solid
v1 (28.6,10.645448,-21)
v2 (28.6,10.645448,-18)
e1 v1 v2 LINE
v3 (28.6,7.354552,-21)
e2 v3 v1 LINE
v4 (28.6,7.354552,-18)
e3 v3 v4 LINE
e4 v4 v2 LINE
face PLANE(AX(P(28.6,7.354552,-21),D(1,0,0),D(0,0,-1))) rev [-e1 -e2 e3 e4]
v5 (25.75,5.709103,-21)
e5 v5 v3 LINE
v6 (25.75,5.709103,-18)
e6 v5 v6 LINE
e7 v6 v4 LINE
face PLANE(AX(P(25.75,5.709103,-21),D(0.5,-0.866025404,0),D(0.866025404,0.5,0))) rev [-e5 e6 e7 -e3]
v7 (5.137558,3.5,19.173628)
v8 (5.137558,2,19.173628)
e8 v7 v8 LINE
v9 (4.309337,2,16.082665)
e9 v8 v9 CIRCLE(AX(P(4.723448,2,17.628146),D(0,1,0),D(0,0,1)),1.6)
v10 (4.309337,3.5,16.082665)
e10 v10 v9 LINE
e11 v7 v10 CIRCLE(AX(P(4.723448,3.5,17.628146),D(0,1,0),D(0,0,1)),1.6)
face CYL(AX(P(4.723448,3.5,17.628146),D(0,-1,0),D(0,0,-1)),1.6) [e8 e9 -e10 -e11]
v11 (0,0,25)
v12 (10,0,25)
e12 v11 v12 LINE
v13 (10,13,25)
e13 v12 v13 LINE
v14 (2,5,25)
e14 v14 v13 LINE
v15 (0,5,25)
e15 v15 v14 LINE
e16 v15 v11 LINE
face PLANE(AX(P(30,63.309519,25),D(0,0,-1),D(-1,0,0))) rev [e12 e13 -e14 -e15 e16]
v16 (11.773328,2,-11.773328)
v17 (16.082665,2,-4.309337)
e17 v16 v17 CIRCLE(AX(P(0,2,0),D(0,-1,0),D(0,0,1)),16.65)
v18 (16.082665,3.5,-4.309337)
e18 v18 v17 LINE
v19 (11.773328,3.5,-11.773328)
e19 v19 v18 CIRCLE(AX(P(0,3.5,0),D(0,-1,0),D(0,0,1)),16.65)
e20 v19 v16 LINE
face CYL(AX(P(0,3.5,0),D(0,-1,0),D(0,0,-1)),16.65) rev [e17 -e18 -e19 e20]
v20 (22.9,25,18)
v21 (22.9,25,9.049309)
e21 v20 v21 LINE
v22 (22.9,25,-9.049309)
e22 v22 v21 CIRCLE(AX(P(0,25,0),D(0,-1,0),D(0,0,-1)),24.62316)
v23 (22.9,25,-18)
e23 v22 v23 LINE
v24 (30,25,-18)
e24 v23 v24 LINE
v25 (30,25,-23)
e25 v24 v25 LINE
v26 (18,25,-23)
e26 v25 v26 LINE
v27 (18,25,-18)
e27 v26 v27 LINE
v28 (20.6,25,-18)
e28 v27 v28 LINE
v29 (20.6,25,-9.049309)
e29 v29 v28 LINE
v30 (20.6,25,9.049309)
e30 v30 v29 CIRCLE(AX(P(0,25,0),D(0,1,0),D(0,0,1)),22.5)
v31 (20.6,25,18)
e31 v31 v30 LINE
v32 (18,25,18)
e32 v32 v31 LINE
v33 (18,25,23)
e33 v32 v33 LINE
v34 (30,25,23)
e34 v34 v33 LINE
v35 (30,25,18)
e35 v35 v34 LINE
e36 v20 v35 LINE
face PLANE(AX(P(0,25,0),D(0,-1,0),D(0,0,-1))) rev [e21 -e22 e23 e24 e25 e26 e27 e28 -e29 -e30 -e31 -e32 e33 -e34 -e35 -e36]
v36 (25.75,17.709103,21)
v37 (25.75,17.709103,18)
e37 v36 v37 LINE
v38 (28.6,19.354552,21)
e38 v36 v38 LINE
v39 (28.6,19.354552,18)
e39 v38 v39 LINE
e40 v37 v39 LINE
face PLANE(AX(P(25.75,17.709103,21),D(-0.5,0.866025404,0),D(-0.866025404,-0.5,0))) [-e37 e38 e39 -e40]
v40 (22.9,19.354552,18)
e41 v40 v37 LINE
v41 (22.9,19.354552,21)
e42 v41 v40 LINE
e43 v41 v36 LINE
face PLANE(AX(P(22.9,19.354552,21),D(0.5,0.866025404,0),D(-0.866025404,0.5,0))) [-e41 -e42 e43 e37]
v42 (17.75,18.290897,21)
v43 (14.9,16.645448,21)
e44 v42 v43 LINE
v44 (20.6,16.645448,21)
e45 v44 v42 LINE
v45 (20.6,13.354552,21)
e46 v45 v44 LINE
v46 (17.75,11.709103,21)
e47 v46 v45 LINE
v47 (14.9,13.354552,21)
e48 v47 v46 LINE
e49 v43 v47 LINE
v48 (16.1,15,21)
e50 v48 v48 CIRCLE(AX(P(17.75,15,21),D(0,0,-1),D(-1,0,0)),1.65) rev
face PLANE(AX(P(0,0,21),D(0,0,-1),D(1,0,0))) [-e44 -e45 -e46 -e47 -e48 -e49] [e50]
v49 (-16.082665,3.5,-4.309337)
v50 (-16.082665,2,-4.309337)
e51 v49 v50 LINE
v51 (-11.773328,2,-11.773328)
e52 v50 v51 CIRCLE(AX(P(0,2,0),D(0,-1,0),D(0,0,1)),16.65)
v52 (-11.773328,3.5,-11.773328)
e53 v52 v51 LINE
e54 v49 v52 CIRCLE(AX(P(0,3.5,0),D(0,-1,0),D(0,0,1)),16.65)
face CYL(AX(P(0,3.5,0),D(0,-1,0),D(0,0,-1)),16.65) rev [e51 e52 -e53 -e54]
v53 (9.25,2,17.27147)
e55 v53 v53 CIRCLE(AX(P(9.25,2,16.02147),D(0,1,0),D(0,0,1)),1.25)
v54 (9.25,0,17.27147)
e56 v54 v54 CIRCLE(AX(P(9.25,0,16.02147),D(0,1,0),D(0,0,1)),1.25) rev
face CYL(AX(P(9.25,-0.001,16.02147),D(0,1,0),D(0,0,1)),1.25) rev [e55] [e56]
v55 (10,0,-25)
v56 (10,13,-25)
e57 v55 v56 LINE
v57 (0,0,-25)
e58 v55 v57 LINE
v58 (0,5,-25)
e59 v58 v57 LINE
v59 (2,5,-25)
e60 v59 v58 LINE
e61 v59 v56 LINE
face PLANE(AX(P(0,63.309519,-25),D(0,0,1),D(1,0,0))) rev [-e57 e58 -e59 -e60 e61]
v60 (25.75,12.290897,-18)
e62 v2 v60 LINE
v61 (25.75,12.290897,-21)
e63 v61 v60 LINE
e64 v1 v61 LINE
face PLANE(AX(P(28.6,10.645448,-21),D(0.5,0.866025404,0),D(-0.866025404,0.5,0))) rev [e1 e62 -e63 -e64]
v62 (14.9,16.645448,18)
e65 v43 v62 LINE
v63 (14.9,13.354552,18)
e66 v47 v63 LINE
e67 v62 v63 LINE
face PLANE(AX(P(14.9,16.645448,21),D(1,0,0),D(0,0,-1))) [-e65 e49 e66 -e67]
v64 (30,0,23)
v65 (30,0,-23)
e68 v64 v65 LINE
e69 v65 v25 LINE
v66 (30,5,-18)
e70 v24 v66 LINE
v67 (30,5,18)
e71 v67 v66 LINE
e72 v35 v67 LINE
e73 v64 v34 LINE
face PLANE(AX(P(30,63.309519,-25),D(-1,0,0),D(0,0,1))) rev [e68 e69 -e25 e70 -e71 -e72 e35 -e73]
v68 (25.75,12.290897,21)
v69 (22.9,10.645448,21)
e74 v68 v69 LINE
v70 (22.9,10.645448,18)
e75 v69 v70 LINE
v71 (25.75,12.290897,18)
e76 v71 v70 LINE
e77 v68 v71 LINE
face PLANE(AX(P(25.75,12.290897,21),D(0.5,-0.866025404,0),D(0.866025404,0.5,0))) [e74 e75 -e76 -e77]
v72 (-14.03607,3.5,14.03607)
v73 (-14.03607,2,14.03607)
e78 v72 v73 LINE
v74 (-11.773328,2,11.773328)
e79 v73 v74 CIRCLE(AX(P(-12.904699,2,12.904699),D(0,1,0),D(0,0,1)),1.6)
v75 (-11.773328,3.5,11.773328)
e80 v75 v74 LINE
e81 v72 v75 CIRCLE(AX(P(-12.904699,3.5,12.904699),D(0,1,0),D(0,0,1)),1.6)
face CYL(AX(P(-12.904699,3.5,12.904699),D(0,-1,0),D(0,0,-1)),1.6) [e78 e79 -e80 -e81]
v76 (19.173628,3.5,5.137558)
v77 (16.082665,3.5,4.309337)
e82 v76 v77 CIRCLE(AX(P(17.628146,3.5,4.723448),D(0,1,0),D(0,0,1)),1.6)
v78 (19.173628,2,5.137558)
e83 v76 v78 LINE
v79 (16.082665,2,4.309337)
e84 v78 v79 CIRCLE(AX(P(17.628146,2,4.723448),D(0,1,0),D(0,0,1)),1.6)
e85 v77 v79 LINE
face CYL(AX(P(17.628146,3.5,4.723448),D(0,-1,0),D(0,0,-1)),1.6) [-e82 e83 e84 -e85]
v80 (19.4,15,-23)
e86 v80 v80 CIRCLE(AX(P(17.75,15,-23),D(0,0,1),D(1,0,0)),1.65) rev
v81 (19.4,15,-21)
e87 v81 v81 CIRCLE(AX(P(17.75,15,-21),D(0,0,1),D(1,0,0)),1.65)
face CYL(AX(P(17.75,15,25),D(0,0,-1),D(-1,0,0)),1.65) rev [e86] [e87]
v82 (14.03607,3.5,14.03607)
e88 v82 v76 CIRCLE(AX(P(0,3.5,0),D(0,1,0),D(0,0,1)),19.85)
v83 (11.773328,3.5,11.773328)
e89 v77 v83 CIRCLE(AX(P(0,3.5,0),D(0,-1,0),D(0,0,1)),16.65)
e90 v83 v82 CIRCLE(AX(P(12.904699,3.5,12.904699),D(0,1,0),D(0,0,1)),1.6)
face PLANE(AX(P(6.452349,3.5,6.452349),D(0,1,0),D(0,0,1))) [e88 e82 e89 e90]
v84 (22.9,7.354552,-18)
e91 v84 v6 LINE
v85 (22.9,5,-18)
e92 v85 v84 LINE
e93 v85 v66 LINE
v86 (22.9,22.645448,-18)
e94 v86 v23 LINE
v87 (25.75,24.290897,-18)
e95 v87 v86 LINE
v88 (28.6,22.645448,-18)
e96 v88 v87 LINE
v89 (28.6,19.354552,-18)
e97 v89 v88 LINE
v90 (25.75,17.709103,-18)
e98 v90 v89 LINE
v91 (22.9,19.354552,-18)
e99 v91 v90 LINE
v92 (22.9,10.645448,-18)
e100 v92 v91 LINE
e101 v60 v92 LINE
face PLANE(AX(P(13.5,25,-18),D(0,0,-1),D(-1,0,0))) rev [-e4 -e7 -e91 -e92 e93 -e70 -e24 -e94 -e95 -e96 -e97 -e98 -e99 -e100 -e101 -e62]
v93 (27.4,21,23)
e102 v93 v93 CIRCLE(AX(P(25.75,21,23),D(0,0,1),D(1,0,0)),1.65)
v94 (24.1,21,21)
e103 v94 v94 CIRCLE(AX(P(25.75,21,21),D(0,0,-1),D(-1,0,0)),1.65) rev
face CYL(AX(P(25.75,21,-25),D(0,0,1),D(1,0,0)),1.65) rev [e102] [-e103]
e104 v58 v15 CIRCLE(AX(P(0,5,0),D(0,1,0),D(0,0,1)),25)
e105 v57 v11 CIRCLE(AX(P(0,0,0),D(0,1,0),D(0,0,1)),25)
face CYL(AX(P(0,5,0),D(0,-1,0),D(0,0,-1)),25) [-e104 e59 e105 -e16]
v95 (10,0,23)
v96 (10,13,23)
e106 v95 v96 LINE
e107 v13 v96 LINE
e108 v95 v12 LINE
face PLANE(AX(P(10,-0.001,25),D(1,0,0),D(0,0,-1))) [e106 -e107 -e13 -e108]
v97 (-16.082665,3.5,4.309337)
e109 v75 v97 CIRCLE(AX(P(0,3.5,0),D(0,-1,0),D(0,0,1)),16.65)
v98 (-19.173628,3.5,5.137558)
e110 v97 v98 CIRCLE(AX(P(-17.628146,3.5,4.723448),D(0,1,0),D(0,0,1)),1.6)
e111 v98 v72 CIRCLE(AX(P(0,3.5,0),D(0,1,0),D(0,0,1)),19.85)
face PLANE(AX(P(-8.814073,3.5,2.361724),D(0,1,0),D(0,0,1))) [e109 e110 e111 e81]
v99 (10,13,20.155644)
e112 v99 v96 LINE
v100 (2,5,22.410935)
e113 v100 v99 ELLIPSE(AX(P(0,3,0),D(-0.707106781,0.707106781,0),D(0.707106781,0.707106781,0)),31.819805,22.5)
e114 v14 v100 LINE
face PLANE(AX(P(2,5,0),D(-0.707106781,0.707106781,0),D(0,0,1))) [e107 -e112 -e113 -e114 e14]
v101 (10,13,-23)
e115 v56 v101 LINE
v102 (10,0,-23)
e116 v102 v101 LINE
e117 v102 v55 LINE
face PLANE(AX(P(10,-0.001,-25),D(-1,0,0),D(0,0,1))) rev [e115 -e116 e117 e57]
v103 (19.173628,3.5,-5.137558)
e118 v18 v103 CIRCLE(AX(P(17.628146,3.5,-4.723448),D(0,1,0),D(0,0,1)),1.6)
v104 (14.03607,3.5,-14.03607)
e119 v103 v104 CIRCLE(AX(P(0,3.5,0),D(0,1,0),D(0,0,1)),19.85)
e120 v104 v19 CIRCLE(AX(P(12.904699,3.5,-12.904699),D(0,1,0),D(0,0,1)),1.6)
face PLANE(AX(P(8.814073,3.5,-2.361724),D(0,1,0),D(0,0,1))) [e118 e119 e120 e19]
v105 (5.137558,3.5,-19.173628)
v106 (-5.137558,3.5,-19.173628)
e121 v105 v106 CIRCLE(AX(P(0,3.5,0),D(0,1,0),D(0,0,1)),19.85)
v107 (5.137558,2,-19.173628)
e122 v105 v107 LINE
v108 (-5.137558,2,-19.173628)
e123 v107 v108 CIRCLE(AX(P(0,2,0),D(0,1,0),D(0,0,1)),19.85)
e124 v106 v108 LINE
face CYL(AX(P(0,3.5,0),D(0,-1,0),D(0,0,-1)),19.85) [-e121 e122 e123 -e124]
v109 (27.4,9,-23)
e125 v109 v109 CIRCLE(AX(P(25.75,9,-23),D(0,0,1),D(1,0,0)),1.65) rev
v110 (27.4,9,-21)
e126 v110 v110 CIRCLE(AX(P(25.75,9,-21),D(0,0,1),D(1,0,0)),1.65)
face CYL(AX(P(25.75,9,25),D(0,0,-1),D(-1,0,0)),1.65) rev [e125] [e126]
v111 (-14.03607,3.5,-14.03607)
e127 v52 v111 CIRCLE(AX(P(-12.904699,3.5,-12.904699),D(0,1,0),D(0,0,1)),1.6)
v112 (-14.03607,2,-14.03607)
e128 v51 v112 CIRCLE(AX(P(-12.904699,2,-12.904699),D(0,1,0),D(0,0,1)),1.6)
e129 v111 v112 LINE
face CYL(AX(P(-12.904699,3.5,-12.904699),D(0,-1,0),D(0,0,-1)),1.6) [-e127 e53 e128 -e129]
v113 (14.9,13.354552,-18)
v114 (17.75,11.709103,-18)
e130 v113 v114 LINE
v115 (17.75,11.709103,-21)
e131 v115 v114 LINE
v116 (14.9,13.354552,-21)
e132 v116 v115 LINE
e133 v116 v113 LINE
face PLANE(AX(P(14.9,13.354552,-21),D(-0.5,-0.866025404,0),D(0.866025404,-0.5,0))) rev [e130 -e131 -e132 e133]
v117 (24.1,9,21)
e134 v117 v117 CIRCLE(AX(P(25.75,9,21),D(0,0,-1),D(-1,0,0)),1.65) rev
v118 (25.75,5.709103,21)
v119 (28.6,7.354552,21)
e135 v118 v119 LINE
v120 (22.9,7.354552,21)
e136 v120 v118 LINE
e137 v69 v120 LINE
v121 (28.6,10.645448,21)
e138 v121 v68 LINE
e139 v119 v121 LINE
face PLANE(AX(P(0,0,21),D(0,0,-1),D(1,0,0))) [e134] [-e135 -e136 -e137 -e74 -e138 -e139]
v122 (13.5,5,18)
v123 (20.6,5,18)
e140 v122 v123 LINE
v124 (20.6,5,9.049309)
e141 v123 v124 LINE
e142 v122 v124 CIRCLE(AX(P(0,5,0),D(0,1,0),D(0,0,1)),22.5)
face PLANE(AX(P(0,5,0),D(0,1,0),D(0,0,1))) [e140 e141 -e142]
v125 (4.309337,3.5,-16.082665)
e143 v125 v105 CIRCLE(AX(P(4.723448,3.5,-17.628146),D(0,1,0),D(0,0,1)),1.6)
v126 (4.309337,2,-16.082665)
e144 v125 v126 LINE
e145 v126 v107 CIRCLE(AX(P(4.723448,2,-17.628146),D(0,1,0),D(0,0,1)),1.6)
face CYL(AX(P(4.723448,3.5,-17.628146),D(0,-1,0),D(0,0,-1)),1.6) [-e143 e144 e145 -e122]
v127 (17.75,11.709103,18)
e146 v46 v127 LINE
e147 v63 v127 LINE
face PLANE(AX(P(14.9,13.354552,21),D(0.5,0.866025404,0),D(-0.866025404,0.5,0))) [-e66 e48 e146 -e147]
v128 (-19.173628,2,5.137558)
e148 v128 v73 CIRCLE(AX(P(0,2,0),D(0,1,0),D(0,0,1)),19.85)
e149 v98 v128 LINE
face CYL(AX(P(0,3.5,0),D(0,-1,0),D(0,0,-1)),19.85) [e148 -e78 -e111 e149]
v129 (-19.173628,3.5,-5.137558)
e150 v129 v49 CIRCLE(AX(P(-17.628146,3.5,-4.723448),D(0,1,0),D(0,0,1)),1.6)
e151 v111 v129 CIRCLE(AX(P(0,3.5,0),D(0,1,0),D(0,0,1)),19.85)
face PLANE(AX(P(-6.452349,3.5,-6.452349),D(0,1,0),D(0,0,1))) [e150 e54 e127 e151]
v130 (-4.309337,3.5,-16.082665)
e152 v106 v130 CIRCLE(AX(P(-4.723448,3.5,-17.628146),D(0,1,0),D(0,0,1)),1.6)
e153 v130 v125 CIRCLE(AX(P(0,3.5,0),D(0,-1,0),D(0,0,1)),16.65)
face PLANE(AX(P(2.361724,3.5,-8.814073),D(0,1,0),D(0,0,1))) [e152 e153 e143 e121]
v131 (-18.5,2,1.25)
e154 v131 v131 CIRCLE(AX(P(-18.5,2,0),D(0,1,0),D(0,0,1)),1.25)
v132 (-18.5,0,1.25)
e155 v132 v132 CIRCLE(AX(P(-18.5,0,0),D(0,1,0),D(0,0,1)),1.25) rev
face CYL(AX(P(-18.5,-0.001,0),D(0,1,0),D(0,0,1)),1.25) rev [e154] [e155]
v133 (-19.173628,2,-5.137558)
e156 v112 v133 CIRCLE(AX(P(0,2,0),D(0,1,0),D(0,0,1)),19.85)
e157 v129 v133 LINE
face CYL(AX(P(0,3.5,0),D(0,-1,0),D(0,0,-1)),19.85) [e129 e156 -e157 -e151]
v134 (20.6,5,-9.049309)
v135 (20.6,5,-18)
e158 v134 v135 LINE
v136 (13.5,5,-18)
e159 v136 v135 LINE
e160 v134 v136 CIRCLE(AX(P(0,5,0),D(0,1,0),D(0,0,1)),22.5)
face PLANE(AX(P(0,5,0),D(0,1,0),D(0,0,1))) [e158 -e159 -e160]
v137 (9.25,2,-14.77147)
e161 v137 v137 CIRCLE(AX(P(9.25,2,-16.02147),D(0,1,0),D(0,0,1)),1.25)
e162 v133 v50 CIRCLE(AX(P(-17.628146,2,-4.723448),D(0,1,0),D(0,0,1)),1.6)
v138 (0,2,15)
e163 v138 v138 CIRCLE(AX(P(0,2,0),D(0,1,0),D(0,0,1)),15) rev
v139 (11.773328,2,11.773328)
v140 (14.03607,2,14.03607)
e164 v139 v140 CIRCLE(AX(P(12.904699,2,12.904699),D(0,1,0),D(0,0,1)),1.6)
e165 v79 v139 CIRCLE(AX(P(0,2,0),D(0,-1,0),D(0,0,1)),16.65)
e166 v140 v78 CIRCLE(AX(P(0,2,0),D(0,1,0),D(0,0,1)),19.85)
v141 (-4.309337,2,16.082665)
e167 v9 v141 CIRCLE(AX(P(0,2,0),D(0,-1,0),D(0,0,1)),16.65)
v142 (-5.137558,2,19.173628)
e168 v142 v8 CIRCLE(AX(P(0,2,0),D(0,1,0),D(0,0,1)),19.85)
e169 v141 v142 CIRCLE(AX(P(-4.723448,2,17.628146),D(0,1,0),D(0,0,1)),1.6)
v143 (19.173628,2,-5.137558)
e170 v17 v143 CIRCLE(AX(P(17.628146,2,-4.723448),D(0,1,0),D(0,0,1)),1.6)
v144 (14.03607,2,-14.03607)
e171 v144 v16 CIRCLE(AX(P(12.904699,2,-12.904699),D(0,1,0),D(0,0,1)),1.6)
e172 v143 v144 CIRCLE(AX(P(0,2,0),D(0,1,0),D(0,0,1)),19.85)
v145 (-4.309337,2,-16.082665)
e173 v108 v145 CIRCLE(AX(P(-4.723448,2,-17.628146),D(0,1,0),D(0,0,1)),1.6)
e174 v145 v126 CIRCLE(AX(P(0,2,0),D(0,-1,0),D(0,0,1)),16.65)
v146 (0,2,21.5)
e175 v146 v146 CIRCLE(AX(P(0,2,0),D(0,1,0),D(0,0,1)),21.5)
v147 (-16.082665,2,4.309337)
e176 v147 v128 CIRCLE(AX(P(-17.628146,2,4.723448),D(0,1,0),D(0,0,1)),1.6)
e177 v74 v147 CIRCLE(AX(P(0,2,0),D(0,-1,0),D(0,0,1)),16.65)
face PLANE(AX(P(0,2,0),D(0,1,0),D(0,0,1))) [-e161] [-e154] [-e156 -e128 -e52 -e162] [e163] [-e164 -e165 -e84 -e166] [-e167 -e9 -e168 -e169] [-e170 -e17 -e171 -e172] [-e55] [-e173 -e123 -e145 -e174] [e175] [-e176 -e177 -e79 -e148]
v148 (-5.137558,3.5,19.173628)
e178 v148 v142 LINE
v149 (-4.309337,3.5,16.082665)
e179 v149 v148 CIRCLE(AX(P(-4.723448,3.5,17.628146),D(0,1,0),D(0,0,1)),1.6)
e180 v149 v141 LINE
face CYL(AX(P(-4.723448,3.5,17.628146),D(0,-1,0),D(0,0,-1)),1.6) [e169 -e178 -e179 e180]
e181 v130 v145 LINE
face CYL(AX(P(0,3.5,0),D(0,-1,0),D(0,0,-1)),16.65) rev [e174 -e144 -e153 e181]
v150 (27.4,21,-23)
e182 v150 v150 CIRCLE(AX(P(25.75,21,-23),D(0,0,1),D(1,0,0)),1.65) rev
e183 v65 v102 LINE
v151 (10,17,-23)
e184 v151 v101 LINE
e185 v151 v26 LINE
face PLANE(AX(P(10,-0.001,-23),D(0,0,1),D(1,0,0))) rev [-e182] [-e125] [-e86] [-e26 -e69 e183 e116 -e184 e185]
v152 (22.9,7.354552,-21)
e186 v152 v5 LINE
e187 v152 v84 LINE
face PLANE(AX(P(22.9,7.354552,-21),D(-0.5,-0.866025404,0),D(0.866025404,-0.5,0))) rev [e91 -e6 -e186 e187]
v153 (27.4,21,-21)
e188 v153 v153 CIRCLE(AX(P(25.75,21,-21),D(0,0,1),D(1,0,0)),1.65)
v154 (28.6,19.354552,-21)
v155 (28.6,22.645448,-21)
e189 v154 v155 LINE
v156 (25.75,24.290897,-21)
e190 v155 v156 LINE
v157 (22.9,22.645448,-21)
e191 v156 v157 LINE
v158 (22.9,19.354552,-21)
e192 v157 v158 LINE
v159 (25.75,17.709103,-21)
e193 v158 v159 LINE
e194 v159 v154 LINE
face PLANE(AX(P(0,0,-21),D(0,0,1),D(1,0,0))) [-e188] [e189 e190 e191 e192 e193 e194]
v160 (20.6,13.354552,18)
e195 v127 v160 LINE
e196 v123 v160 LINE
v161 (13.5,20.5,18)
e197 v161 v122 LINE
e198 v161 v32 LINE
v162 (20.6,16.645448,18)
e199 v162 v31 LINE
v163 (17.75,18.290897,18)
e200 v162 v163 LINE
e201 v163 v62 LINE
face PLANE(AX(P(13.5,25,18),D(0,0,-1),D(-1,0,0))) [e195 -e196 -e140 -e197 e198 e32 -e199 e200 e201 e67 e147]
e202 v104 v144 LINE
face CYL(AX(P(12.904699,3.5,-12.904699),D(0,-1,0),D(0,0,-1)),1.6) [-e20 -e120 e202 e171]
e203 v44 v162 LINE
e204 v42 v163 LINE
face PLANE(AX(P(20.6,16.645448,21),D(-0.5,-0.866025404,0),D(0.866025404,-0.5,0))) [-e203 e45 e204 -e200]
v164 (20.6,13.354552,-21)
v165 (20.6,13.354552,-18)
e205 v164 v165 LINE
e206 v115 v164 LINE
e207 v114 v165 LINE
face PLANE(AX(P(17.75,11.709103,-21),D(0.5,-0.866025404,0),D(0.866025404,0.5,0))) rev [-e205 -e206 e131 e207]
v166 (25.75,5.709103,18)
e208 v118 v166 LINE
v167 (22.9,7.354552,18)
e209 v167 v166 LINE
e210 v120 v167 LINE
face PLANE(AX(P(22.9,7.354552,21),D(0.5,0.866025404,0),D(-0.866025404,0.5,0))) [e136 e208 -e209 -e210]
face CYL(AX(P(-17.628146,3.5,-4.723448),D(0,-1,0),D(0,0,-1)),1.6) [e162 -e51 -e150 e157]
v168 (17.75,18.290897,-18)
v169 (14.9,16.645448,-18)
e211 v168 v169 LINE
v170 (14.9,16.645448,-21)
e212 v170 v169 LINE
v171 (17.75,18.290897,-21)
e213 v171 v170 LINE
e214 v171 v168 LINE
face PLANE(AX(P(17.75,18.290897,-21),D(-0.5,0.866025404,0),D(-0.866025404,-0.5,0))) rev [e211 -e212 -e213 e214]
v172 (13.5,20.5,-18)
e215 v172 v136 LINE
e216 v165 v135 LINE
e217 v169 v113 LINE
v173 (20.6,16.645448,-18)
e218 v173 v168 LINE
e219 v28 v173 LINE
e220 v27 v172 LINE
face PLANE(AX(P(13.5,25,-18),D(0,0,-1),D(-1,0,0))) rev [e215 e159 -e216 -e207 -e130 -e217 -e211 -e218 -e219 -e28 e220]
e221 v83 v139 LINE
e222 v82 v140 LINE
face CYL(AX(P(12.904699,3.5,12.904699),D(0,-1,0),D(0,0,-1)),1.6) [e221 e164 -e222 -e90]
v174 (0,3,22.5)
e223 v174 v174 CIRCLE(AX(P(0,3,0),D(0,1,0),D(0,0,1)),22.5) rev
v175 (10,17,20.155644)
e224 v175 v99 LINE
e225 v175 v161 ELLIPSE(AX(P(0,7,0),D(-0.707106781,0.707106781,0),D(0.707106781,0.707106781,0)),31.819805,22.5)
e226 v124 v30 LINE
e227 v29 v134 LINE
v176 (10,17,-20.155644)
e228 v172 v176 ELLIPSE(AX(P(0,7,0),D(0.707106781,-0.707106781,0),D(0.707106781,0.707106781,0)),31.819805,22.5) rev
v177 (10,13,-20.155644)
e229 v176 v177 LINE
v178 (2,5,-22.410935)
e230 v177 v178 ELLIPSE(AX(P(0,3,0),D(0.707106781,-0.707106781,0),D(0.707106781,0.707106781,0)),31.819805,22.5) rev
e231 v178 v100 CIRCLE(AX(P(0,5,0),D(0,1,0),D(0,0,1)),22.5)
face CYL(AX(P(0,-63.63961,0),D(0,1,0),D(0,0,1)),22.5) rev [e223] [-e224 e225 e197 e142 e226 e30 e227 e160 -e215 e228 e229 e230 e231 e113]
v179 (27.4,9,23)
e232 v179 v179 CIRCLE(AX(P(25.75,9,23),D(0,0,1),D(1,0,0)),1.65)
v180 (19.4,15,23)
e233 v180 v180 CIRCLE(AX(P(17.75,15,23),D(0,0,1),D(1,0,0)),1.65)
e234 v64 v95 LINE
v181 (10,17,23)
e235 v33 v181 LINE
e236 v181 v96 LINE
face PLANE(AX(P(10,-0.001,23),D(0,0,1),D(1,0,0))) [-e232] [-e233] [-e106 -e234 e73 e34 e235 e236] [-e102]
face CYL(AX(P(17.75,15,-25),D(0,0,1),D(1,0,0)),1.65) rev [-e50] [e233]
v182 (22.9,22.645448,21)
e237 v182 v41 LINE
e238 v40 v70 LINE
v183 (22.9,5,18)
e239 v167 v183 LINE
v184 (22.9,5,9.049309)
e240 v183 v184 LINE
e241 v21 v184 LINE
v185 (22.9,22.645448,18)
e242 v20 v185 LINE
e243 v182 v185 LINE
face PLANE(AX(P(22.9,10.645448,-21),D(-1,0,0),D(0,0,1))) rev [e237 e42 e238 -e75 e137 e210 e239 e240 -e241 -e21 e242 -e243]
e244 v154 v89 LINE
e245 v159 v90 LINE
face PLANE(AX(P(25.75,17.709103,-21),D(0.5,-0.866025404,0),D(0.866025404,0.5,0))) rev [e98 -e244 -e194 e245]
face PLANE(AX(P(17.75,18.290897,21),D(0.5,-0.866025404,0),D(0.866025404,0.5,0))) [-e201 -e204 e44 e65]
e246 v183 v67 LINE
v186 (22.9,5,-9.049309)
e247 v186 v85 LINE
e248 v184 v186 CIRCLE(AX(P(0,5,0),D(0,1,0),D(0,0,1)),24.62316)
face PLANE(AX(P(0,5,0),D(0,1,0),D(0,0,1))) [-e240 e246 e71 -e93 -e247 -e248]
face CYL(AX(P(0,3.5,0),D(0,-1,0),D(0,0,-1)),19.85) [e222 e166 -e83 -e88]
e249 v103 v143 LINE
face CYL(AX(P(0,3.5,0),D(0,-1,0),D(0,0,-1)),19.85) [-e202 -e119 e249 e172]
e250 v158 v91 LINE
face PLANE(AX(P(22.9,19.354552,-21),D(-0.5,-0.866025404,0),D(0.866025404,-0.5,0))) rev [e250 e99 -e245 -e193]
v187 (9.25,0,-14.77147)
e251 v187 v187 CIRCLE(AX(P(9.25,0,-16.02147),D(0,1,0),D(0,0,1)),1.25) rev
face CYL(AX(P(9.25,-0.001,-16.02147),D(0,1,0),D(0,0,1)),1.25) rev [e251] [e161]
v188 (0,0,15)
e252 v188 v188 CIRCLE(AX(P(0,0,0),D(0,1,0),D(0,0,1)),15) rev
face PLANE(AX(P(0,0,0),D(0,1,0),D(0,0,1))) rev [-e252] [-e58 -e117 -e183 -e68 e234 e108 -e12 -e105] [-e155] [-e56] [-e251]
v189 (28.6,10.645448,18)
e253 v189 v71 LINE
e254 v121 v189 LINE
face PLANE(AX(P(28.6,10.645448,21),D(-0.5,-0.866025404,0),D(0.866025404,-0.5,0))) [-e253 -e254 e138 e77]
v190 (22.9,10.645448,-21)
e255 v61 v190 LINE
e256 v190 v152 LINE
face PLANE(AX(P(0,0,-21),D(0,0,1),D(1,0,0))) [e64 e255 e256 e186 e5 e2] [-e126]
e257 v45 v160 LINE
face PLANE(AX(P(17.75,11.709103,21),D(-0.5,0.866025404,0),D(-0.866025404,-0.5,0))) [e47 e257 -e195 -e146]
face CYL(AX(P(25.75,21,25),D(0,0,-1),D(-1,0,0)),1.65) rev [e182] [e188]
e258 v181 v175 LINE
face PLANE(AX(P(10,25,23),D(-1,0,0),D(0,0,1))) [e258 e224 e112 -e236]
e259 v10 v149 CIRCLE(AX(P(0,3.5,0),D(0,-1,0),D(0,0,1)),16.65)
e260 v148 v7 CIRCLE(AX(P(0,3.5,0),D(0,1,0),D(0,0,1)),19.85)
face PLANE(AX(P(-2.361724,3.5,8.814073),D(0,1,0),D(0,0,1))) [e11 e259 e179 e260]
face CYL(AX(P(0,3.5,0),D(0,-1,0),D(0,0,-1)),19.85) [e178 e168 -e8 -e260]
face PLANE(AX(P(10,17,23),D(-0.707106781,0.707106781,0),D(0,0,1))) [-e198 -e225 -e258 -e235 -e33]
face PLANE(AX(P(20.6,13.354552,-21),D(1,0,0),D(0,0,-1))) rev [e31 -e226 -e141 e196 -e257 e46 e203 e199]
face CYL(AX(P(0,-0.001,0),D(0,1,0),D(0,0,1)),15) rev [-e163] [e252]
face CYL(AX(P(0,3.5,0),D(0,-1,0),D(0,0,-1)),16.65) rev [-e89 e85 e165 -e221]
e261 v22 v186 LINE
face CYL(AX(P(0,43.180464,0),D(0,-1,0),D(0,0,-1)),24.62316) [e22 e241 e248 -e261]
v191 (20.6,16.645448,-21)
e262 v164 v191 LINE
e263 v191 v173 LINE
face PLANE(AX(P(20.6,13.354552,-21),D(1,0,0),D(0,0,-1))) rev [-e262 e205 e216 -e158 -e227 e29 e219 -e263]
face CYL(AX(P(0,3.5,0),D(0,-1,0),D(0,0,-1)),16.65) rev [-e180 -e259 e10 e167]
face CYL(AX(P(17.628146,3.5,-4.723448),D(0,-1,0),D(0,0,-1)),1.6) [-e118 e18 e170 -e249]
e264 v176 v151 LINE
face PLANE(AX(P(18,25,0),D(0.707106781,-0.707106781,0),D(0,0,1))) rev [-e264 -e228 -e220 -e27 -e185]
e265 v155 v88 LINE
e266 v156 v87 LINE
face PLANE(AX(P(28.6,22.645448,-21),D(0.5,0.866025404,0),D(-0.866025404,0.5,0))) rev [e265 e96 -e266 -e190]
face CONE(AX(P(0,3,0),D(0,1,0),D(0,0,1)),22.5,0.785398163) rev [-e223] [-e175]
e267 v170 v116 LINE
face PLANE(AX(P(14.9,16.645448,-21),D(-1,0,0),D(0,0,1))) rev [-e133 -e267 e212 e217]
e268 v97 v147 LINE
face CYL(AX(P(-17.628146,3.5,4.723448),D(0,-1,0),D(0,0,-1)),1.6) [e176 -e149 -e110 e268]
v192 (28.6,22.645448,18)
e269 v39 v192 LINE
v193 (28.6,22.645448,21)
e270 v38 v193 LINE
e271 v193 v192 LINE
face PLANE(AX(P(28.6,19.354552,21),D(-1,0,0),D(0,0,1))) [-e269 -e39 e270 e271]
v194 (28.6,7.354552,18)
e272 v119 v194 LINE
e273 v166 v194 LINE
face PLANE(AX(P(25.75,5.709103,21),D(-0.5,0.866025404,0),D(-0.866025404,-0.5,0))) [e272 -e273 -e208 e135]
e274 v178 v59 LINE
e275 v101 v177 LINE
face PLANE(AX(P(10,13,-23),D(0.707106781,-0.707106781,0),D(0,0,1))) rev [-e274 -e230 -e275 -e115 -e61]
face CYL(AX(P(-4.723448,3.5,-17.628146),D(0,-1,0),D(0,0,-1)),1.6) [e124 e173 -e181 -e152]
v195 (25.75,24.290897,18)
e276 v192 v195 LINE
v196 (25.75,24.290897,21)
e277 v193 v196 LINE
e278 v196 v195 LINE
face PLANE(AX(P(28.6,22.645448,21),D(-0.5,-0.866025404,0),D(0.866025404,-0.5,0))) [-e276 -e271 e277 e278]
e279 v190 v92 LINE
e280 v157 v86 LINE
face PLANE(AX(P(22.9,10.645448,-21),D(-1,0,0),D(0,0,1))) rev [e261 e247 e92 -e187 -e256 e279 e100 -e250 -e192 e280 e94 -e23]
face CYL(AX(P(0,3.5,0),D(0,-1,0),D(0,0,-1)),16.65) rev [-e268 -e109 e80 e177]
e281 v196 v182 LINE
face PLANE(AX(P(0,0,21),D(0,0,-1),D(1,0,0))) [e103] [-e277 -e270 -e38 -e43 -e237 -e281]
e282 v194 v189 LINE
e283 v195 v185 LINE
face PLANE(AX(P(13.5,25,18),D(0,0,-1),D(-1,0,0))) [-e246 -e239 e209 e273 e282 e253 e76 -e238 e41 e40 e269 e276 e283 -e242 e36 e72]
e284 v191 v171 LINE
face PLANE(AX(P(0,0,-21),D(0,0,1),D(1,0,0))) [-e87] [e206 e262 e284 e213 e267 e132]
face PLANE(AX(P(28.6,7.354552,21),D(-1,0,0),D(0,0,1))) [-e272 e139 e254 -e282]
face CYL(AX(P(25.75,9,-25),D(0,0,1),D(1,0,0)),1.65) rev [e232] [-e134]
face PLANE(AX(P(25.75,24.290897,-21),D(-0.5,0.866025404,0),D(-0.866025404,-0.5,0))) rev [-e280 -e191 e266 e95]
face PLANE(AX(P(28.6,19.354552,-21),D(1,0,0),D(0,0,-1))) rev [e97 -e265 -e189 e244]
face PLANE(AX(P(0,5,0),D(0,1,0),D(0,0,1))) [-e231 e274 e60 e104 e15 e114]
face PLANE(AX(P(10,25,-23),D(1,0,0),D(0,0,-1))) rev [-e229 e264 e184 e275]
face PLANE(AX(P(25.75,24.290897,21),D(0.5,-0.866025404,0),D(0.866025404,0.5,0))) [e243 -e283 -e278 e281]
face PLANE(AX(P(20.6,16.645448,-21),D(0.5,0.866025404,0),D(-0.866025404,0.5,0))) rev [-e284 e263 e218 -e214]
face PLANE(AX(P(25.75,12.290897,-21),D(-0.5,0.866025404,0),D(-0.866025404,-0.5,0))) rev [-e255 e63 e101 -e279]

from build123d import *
from build123d.topology import SkipClean

# Parameters (mm, degrees)
SKETCH_1_R                      = 25
EXTRUDE_1_DEPTH                 = 5
CUT_EXTRUDE_1_REACH             = 37.707
SKETCH_2_R                      = 15
SKETCH_3_R                      = 22.5
CUT_EXTRUDE_2_DEPTH             = 3
CUT_EXTRUDE_3_REACH             = 37.482
SKETCH_4_R                      = 1.25
CHAMFER_1_SIZE                  = 1
EXTRUDE_2_DEPTH                 = 1.5
EXTRUDE_3_DEPTH                 = 5
CUT_EXTRUDE_4_REACH             = 41.37
SKETCH_10_W                     = 20
SKETCH_10_H                     = 2
EXTRUDE_START                   = 20
EXTRUDE_4_DEPTH                 = 20
CUT_EXTRUDE_5_REACH             = 60.086
SKETCH_11_R                     = 1.65
CUT_EXTRUDE_5_DIRECTION_2_DEPTH = 59.086142926
CUT_EXTRUDE_6_DEPTH             = 3
CHAMFER_4_SIZE                  = 8
EXTRUDE_8_DEPTH                 = 2
SKETCH_15_W                     = 2.3
SKETCH_15_H                     = 20
EXTRUDE_9_DEPTH                 = 36
CUT_EXTRUDE_8_REACH             = 48.368
SKETCH_14_R                     = 22.5
EXTRUDE_7_DEPTH                 = 20


# Read off the part's stored shape, not the designer's step: 镜向3
with BuildPart() as part:
    # 草图1 → 凸台-拉伸1 (new body)
    with BuildSketch(Plane(origin=(0, 0, 0), x_dir=(1, 0, 0), z_dir=(0, 1, 0))):
        with Locations(Location((0, 0, 0), (0, 0, 270))):
            Circle(SKETCH_1_R)
    extrude(amount=EXTRUDE_1_DEPTH)

    # 草图2 → 切除-拉伸1 (cut, up to next)
    with BuildSketch(Plane(origin=(0, 5, 0), x_dir=(1, 0, 0), z_dir=(0, 1, 0)), mode=Mode.PRIVATE) as cut_extrude_1_sk1:
        with Locations(Location((0, 0, 0), (0, 0, 270))):
            Circle(SKETCH_2_R)
    cut_extrude_1_tool1 = extrude(cut_extrude_1_sk1.sketch, amount=-CUT_EXTRUDE_1_REACH, mode=Mode.PRIVATE) & part.part
    add(cut_extrude_1_tool1.solids().sort_by_distance((0, 5, 0))[0], mode=Mode.SUBTRACT)

    # 草图3 → 切除-拉伸2 (cut)
    with BuildSketch(Plane(origin=(0, 5, 0), x_dir=(1, 0, 0), z_dir=(0, 1, 0))):
        with Locations(Location((0, 0, 0), (0, 0, 270))):
            Circle(SKETCH_3_R)
    extrude(amount=-CUT_EXTRUDE_2_DEPTH, mode=Mode.SUBTRACT)

    # 草图4 → 切除-拉伸3 (cut, up to next)
    with BuildSketch(Plane(origin=(0, 2, 0), x_dir=(1, 0, 0), z_dir=(0, 1, 0)), mode=Mode.PRIVATE) as cut_extrude_3_sk1:
        with Locations(Location((9.25, -16.02146997, 0), (0, 0, 270))):
            Circle(SKETCH_4_R)
    cut_extrude_3_tool1 = extrude(cut_extrude_3_sk1.sketch, amount=-CUT_EXTRUDE_3_REACH, mode=Mode.PRIVATE) & part.part
    # 草图4 → 切除-拉伸3 (cut, up to next)
    with BuildSketch(Plane(origin=(0, 2, 0), x_dir=(1, 0, 0), z_dir=(0, 1, 0)), mode=Mode.PRIVATE) as cut_extrude_3_sk2:
        with Locations(Location((-18.5, 0, 0), (0, 0, 270))):
            Circle(SKETCH_4_R)
    cut_extrude_3_tool2 = extrude(cut_extrude_3_sk2.sketch, amount=-CUT_EXTRUDE_3_REACH, mode=Mode.PRIVATE) & part.part
    # 草图4 → 切除-拉伸3 (cut, up to next)
    with BuildSketch(Plane(origin=(0, 2, 0), x_dir=(1, 0, 0), z_dir=(0, 1, 0)), mode=Mode.PRIVATE) as cut_extrude_3_sk3:
        with Locations(Location((9.25, 16.02146997, 0), (0, 0, 270))):
            Circle(SKETCH_4_R)
    cut_extrude_3_tool3 = extrude(cut_extrude_3_sk3.sketch, amount=-CUT_EXTRUDE_3_REACH, mode=Mode.PRIVATE) & part.part
    add(cut_extrude_3_tool1.solids().sort_by_distance((9.25, 2, 16.02147))[0], mode=Mode.SUBTRACT)
    add(cut_extrude_3_tool2.solids().sort_by_distance((-18.5, 2, 0))[0], mode=Mode.SUBTRACT)
    add(cut_extrude_3_tool3.solids().sort_by_distance((9.25, 2, -16.02147))[0], mode=Mode.SUBTRACT)

    # 倒角1
    chamfer_1_edges = [part.edges().sort_by_distance(p)[0] for p in [
        (0, 2, -22.5),
    ]]
    chamfer(chamfer_1_edges, length=CHAMFER_1_SIZE)

    # 草图7 → 凸台-拉伸2 (add)
    with BuildSketch(Plane(origin=(0, 2, 0), x_dir=(1, 0, 0), z_dir=(0, 1, 0))):
        with BuildLine():
            ThreePointArc((5.137558045, 19.173627652), (0, 19.85), (-5.137558045, 19.173627652))
            ThreePointArc((-5.137558045, 19.173627652), (-6.268928895, 17.214035858), (-4.309337101, 16.082665008))
            ThreePointArc((-4.309337101, 16.082665008), (0, 16.65), (4.309337101, 16.082665008))
            ThreePointArc((4.309337101, 16.082665008), (6.268928895, 17.214035858), (5.137558045, 19.173627652))
        make_face()
        with BuildLine():
            ThreePointArc((19.173627652, 5.137558045), (17.190604265, 9.925), (14.036069607, 14.036069607))
            ThreePointArc((14.036069607, 14.036069607), (11.773327907, 14.036069607), (11.773327907, 11.773327907))
            ThreePointArc((11.773327907, 11.773327907), (14.419322973, 8.325), (16.082665008, 4.309337101))
            ThreePointArc((16.082665008, 4.309337101), (18.042256802, 3.177966251), (19.173627652, 5.137558045))
        make_face()
        with BuildLine():
            ThreePointArc((14.036069607, -14.036069607), (17.190604265, -9.925), (19.173627652, -5.137558045))
            ThreePointArc((19.173627652, -5.137558045), (18.042256802, -3.177966251), (16.082665008, -4.309337101))
            ThreePointArc((16.082665008, -4.309337101), (14.419322973, -8.325), (11.773327907, -11.773327907))
            ThreePointArc((11.773327907, -11.773327907), (11.773327907, -14.036069607), (14.036069607, -14.036069607))
        make_face()
        with BuildLine():
            ThreePointArc((-5.137558045, -19.173627652), (0, -19.85), (5.137558045, -19.173627652))
            ThreePointArc((5.137558045, -19.173627652), (6.268928895, -17.214035858), (4.309337101, -16.082665008))
            ThreePointArc((4.309337101, -16.082665008), (0, -16.65), (-4.309337101, -16.082665008))
            ThreePointArc((-4.309337101, -16.082665008), (-6.268928895, -17.214035858), (-5.137558045, -19.173627652))
        make_face()
        with BuildLine():
            ThreePointArc((-19.173627652, -5.137558045), (-17.190604265, -9.925), (-14.036069607, -14.036069607))
            ThreePointArc((-14.036069607, -14.036069607), (-11.773327907, -14.036069607), (-11.773327907, -11.773327907))
            ThreePointArc((-11.773327907, -11.773327907), (-14.419322973, -8.325), (-16.082665008, -4.309337101))
            ThreePointArc((-16.082665008, -4.309337101), (-18.042256802, -3.177966251), (-19.173627652, -5.137558045))
        make_face()
        with BuildLine():
            ThreePointArc((-14.036069607, 14.036069607), (-17.190604265, 9.925), (-19.173627652, 5.137558045))
            ThreePointArc((-19.173627652, 5.137558045), (-18.042256802, 3.177966251), (-16.082665008, 4.309337101))
            ThreePointArc((-16.082665008, 4.309337101), (-14.419322973, 8.325), (-11.773327907, 11.773327907))
            ThreePointArc((-11.773327907, 11.773327907), (-11.773327907, 14.036069607), (-14.036069607, 14.036069607))
        make_face()
    extrude(amount=EXTRUDE_2_DEPTH)

    # 草图8 → 凸台-拉伸3 (add)
    with BuildSketch(Plane(origin=(0, 0, 0), x_dir=(1, 0, 0), z_dir=(0, 1, 0))):
        with BuildLine():
            Line((0, 25), (30, 25))
            Line((30, 25), (30, -25))
            Line((30, -25), (0, -25))
            ThreePointArc((0, -25), (25, 0), (0, 25))
        make_face()
    extrude(amount=EXTRUDE_3_DEPTH)

    # 草图10 → 切除-拉伸4 (cut, up to next)
    with BuildSketch(Plane(origin=(0, 5, 0), x_dir=(1, 0, 0), z_dir=(0, 1, 0)), mode=Mode.PRIVATE) as cut_extrude_4_sk1:
        with Locations((20, 24)):
            Rectangle(SKETCH_10_W, SKETCH_10_H)
    cut_extrude_4_tool1 = extrude(cut_extrude_4_sk1.sketch, amount=-CUT_EXTRUDE_4_REACH, mode=Mode.PRIVATE) & part.part
    add(cut_extrude_4_tool1.solids().sort_by_distance((20, 5, -24))[0], mode=Mode.SUBTRACT)

    # 草图9 → 凸台-拉伸4 (add)
    with SkipClean():  # the faces are left unmerged after this step: merging them gives an invalid solid
        with BuildSketch(Plane(origin=(0, 5, 0), x_dir=(1, 0, 0), z_dir=(0, 1, 0)).offset(EXTRUDE_START)):
            with BuildLine():
                Line((13.5, 18), (30, 18))
                Line((30, 18), (30, 23))
                Line((30, 23), (10, 23))
                Line((10, 23), (10, 20.155644371))
                ThreePointArc((10, 20.155644371), (11.799330518, 19.157917406), (13.5, 18))
            make_face()
        extrude(amount=-EXTRUDE_4_DEPTH)

    # 草图11 → 切除-拉伸5 (cut, up to next)
    with BuildSketch(Plane.XY.offset(-18), mode=Mode.PRIVATE) as cut_extrude_5_sk1:
        with Locations(Location((17.75, 15, 0), (0, 0, 180))):
            Circle(SKETCH_11_R)
    cut_extrude_5_tool1 = extrude(cut_extrude_5_sk1.sketch, amount=-CUT_EXTRUDE_5_REACH, mode=Mode.PRIVATE) & part.part
    # 草图11 → 切除-拉伸5 (cut, up to next)
    with BuildSketch(Plane.XY.offset(-18), mode=Mode.PRIVATE) as cut_extrude_5_sk2:
        with Locations(Location((25.75, 21, 0), (0, 0, 180))):
            Circle(SKETCH_11_R)
    cut_extrude_5_tool2 = extrude(cut_extrude_5_sk2.sketch, amount=-CUT_EXTRUDE_5_REACH, mode=Mode.PRIVATE) & part.part
    # 草图11 → 切除-拉伸5 (cut, up to next)
    with BuildSketch(Plane.XY.offset(-18), mode=Mode.PRIVATE) as cut_extrude_5_sk3:
        with Locations(Location((25.75, 9, 0), (0, 0, 180))):
            Circle(SKETCH_11_R)
    cut_extrude_5_tool3 = extrude(cut_extrude_5_sk3.sketch, amount=-CUT_EXTRUDE_5_REACH, mode=Mode.PRIVATE) & part.part
    add(cut_extrude_5_tool1.solids().sort_by_distance((17.75, 15, -18))[0], mode=Mode.SUBTRACT)
    add(cut_extrude_5_tool2.solids().sort_by_distance((25.75, 21, -18))[0], mode=Mode.SUBTRACT)
    add(cut_extrude_5_tool3.solids().sort_by_distance((25.75, 9, -18))[0], mode=Mode.SUBTRACT)

    # 草图11 → 切除-拉伸5 direction 2 (cut)
    with SkipClean():  # the faces are left unmerged after this step: merging them gives an invalid solid
        with BuildSketch(Plane.XY.offset(-18)):
            with Locations(Location((17.75, 15, 0), (0, 0, 180))):
                Circle(SKETCH_11_R)
            with Locations(Location((25.75, 21, 0), (0, 0, 180))):
                Circle(SKETCH_11_R)
            with Locations(Location((25.75, 9, 0), (0, 0, 180))):
                Circle(SKETCH_11_R)
        extrude(amount=CUT_EXTRUDE_5_DIRECTION_2_DEPTH, mode=Mode.SUBTRACT)

    # 草图12 → 切除-拉伸6 (cut)
    with SkipClean():  # the faces are left unmerged after this step: merging them gives an invalid solid
        with BuildSketch(Plane.XY.offset(-18)):
            Polygon((28.6, 22.645448267), (25.75, 24.290896534), (22.9, 22.645448267), (22.9, 19.354551733), (25.75, 17.709103466), (28.6, 19.354551733), align=None)
            Polygon((28.6, 10.645448267), (25.75, 12.290896534), (22.9, 10.645448267), (22.9, 7.354551733), (25.75, 5.709103466), (28.6, 7.354551733), align=None)
            Polygon((20.6, 16.645448267), (17.75, 18.290896534), (14.9, 16.645448267), (14.9, 13.354551733), (17.75, 11.709103466), (20.6, 13.354551733), align=None)
        extrude(amount=-CUT_EXTRUDE_6_DEPTH, mode=Mode.SUBTRACT)

    # 倒角4
    # the kernel refuses this chamfer: 8 mm, written as the material it adds along each edge
    with BuildSketch(Plane(origin=(10, 5, -23), x_dir=(-0.9996219169112968, -0.02749587661058638, 0), z_dir=(0, 0, 1))) as chamfer_4_piece_1_section:
        Polygon((CHAMFER_4_SIZE * 0.999621916911, -CHAMFER_4_SIZE * 0.0274958766106), (-CHAMFER_4_SIZE * 0.0274958766106, -CHAMFER_4_SIZE * 0.999621916911), (0, 0), align=None)
    chamfer_4_piece_1 = extrude(amount=23.417819533, mode=Mode.PRIVATE)
    chamfer_4_piece_1 = chamfer_4_piece_1 - Plane(origin=(0, 7.978966695, 0), x_dir=(0, 0, 1), z_dir=(0, 1, 0)) * Cylinder(22.5, 79, mode=Mode.PRIVATE)
    add(chamfer_4_piece_1)
    # the kernel refuses this chamfer: 8 mm, written as the material it takes off along each edge
    with BuildSketch(Plane(origin=(10, 25, -43.573463904), x_dir=(-0.02749587661058627, -0.9996219169112968, 0), z_dir=(0, 0, 1))) as chamfer_4_2_piece_1:
        Polygon((CHAMFER_4_SIZE * 0.999621916911, CHAMFER_4_SIZE * 0.0274958766106), (-CHAMFER_4_SIZE * 0.0274958766106, CHAMFER_4_SIZE * 0.999621916911), (0, 0), align=None)
    extrude(amount=43.991283437, mode=Mode.SUBTRACT)

    # 草图17 → 凸台-拉伸8 (add)
    with BuildSketch(Plane(origin=(0, 0, -23), x_dir=(-1, 0, 0), z_dir=(0, 0, -1))):
        Polygon((-10, 13), (-10, 5), (-2, 5), align=None)
    extrude(amount=EXTRUDE_8_DEPTH)

    # 镜向3
    split(bisect_by=Plane.XY, keep=Keep.BOTTOM)

    # Mirror 3 2: part across plane


with BuildPart() as part_1:
    add(part.part)
    add(part.part.mirror(Plane.XY))

    # 草图15 → 凸台-拉伸9 (add)
    with BuildSketch(Plane.XY.offset(-18)):
        with Locations((21.75, 15)):
            Rectangle(SKETCH_15_W, SKETCH_15_H)
    extrude(amount=EXTRUDE_9_DEPTH)

    # 草图14 → 切除-拉伸8 (cut, up to next)
    with BuildSketch(Plane(origin=(0, 25, 0), x_dir=(1, 0, 0), z_dir=(0, 1, 0)), mode=Mode.PRIVATE) as cut_extrude_8_sk1:
        with Locations(Location((0, 0, 0), (0, 0, 270))):
            Circle(SKETCH_14_R)
    cut_extrude_8_tool1 = extrude(cut_extrude_8_sk1.sketch, amount=-CUT_EXTRUDE_8_REACH, mode=Mode.PRIVATE) & part_1.part
    add(cut_extrude_8_tool1.solids().sort_by_distance((0, 25, 0))[0], mode=Mode.SUBTRACT)

    # 草图16 → 凸台-拉伸7 (add)
    with BuildSketch(Plane(origin=(0, 5, 0), x_dir=(1, 0, 0), z_dir=(0, 1, 0))):
        with BuildLine():
            Line((22.9, 9.049309366), (22.9, -9.049309366))
            ThreePointArc((22.9, -9.049309366), (24.62315983, 0), (22.9, 9.049309366))
        make_face()
    extrude(amount=EXTRUDE_7_DEPTH)


solid = part_1.part
